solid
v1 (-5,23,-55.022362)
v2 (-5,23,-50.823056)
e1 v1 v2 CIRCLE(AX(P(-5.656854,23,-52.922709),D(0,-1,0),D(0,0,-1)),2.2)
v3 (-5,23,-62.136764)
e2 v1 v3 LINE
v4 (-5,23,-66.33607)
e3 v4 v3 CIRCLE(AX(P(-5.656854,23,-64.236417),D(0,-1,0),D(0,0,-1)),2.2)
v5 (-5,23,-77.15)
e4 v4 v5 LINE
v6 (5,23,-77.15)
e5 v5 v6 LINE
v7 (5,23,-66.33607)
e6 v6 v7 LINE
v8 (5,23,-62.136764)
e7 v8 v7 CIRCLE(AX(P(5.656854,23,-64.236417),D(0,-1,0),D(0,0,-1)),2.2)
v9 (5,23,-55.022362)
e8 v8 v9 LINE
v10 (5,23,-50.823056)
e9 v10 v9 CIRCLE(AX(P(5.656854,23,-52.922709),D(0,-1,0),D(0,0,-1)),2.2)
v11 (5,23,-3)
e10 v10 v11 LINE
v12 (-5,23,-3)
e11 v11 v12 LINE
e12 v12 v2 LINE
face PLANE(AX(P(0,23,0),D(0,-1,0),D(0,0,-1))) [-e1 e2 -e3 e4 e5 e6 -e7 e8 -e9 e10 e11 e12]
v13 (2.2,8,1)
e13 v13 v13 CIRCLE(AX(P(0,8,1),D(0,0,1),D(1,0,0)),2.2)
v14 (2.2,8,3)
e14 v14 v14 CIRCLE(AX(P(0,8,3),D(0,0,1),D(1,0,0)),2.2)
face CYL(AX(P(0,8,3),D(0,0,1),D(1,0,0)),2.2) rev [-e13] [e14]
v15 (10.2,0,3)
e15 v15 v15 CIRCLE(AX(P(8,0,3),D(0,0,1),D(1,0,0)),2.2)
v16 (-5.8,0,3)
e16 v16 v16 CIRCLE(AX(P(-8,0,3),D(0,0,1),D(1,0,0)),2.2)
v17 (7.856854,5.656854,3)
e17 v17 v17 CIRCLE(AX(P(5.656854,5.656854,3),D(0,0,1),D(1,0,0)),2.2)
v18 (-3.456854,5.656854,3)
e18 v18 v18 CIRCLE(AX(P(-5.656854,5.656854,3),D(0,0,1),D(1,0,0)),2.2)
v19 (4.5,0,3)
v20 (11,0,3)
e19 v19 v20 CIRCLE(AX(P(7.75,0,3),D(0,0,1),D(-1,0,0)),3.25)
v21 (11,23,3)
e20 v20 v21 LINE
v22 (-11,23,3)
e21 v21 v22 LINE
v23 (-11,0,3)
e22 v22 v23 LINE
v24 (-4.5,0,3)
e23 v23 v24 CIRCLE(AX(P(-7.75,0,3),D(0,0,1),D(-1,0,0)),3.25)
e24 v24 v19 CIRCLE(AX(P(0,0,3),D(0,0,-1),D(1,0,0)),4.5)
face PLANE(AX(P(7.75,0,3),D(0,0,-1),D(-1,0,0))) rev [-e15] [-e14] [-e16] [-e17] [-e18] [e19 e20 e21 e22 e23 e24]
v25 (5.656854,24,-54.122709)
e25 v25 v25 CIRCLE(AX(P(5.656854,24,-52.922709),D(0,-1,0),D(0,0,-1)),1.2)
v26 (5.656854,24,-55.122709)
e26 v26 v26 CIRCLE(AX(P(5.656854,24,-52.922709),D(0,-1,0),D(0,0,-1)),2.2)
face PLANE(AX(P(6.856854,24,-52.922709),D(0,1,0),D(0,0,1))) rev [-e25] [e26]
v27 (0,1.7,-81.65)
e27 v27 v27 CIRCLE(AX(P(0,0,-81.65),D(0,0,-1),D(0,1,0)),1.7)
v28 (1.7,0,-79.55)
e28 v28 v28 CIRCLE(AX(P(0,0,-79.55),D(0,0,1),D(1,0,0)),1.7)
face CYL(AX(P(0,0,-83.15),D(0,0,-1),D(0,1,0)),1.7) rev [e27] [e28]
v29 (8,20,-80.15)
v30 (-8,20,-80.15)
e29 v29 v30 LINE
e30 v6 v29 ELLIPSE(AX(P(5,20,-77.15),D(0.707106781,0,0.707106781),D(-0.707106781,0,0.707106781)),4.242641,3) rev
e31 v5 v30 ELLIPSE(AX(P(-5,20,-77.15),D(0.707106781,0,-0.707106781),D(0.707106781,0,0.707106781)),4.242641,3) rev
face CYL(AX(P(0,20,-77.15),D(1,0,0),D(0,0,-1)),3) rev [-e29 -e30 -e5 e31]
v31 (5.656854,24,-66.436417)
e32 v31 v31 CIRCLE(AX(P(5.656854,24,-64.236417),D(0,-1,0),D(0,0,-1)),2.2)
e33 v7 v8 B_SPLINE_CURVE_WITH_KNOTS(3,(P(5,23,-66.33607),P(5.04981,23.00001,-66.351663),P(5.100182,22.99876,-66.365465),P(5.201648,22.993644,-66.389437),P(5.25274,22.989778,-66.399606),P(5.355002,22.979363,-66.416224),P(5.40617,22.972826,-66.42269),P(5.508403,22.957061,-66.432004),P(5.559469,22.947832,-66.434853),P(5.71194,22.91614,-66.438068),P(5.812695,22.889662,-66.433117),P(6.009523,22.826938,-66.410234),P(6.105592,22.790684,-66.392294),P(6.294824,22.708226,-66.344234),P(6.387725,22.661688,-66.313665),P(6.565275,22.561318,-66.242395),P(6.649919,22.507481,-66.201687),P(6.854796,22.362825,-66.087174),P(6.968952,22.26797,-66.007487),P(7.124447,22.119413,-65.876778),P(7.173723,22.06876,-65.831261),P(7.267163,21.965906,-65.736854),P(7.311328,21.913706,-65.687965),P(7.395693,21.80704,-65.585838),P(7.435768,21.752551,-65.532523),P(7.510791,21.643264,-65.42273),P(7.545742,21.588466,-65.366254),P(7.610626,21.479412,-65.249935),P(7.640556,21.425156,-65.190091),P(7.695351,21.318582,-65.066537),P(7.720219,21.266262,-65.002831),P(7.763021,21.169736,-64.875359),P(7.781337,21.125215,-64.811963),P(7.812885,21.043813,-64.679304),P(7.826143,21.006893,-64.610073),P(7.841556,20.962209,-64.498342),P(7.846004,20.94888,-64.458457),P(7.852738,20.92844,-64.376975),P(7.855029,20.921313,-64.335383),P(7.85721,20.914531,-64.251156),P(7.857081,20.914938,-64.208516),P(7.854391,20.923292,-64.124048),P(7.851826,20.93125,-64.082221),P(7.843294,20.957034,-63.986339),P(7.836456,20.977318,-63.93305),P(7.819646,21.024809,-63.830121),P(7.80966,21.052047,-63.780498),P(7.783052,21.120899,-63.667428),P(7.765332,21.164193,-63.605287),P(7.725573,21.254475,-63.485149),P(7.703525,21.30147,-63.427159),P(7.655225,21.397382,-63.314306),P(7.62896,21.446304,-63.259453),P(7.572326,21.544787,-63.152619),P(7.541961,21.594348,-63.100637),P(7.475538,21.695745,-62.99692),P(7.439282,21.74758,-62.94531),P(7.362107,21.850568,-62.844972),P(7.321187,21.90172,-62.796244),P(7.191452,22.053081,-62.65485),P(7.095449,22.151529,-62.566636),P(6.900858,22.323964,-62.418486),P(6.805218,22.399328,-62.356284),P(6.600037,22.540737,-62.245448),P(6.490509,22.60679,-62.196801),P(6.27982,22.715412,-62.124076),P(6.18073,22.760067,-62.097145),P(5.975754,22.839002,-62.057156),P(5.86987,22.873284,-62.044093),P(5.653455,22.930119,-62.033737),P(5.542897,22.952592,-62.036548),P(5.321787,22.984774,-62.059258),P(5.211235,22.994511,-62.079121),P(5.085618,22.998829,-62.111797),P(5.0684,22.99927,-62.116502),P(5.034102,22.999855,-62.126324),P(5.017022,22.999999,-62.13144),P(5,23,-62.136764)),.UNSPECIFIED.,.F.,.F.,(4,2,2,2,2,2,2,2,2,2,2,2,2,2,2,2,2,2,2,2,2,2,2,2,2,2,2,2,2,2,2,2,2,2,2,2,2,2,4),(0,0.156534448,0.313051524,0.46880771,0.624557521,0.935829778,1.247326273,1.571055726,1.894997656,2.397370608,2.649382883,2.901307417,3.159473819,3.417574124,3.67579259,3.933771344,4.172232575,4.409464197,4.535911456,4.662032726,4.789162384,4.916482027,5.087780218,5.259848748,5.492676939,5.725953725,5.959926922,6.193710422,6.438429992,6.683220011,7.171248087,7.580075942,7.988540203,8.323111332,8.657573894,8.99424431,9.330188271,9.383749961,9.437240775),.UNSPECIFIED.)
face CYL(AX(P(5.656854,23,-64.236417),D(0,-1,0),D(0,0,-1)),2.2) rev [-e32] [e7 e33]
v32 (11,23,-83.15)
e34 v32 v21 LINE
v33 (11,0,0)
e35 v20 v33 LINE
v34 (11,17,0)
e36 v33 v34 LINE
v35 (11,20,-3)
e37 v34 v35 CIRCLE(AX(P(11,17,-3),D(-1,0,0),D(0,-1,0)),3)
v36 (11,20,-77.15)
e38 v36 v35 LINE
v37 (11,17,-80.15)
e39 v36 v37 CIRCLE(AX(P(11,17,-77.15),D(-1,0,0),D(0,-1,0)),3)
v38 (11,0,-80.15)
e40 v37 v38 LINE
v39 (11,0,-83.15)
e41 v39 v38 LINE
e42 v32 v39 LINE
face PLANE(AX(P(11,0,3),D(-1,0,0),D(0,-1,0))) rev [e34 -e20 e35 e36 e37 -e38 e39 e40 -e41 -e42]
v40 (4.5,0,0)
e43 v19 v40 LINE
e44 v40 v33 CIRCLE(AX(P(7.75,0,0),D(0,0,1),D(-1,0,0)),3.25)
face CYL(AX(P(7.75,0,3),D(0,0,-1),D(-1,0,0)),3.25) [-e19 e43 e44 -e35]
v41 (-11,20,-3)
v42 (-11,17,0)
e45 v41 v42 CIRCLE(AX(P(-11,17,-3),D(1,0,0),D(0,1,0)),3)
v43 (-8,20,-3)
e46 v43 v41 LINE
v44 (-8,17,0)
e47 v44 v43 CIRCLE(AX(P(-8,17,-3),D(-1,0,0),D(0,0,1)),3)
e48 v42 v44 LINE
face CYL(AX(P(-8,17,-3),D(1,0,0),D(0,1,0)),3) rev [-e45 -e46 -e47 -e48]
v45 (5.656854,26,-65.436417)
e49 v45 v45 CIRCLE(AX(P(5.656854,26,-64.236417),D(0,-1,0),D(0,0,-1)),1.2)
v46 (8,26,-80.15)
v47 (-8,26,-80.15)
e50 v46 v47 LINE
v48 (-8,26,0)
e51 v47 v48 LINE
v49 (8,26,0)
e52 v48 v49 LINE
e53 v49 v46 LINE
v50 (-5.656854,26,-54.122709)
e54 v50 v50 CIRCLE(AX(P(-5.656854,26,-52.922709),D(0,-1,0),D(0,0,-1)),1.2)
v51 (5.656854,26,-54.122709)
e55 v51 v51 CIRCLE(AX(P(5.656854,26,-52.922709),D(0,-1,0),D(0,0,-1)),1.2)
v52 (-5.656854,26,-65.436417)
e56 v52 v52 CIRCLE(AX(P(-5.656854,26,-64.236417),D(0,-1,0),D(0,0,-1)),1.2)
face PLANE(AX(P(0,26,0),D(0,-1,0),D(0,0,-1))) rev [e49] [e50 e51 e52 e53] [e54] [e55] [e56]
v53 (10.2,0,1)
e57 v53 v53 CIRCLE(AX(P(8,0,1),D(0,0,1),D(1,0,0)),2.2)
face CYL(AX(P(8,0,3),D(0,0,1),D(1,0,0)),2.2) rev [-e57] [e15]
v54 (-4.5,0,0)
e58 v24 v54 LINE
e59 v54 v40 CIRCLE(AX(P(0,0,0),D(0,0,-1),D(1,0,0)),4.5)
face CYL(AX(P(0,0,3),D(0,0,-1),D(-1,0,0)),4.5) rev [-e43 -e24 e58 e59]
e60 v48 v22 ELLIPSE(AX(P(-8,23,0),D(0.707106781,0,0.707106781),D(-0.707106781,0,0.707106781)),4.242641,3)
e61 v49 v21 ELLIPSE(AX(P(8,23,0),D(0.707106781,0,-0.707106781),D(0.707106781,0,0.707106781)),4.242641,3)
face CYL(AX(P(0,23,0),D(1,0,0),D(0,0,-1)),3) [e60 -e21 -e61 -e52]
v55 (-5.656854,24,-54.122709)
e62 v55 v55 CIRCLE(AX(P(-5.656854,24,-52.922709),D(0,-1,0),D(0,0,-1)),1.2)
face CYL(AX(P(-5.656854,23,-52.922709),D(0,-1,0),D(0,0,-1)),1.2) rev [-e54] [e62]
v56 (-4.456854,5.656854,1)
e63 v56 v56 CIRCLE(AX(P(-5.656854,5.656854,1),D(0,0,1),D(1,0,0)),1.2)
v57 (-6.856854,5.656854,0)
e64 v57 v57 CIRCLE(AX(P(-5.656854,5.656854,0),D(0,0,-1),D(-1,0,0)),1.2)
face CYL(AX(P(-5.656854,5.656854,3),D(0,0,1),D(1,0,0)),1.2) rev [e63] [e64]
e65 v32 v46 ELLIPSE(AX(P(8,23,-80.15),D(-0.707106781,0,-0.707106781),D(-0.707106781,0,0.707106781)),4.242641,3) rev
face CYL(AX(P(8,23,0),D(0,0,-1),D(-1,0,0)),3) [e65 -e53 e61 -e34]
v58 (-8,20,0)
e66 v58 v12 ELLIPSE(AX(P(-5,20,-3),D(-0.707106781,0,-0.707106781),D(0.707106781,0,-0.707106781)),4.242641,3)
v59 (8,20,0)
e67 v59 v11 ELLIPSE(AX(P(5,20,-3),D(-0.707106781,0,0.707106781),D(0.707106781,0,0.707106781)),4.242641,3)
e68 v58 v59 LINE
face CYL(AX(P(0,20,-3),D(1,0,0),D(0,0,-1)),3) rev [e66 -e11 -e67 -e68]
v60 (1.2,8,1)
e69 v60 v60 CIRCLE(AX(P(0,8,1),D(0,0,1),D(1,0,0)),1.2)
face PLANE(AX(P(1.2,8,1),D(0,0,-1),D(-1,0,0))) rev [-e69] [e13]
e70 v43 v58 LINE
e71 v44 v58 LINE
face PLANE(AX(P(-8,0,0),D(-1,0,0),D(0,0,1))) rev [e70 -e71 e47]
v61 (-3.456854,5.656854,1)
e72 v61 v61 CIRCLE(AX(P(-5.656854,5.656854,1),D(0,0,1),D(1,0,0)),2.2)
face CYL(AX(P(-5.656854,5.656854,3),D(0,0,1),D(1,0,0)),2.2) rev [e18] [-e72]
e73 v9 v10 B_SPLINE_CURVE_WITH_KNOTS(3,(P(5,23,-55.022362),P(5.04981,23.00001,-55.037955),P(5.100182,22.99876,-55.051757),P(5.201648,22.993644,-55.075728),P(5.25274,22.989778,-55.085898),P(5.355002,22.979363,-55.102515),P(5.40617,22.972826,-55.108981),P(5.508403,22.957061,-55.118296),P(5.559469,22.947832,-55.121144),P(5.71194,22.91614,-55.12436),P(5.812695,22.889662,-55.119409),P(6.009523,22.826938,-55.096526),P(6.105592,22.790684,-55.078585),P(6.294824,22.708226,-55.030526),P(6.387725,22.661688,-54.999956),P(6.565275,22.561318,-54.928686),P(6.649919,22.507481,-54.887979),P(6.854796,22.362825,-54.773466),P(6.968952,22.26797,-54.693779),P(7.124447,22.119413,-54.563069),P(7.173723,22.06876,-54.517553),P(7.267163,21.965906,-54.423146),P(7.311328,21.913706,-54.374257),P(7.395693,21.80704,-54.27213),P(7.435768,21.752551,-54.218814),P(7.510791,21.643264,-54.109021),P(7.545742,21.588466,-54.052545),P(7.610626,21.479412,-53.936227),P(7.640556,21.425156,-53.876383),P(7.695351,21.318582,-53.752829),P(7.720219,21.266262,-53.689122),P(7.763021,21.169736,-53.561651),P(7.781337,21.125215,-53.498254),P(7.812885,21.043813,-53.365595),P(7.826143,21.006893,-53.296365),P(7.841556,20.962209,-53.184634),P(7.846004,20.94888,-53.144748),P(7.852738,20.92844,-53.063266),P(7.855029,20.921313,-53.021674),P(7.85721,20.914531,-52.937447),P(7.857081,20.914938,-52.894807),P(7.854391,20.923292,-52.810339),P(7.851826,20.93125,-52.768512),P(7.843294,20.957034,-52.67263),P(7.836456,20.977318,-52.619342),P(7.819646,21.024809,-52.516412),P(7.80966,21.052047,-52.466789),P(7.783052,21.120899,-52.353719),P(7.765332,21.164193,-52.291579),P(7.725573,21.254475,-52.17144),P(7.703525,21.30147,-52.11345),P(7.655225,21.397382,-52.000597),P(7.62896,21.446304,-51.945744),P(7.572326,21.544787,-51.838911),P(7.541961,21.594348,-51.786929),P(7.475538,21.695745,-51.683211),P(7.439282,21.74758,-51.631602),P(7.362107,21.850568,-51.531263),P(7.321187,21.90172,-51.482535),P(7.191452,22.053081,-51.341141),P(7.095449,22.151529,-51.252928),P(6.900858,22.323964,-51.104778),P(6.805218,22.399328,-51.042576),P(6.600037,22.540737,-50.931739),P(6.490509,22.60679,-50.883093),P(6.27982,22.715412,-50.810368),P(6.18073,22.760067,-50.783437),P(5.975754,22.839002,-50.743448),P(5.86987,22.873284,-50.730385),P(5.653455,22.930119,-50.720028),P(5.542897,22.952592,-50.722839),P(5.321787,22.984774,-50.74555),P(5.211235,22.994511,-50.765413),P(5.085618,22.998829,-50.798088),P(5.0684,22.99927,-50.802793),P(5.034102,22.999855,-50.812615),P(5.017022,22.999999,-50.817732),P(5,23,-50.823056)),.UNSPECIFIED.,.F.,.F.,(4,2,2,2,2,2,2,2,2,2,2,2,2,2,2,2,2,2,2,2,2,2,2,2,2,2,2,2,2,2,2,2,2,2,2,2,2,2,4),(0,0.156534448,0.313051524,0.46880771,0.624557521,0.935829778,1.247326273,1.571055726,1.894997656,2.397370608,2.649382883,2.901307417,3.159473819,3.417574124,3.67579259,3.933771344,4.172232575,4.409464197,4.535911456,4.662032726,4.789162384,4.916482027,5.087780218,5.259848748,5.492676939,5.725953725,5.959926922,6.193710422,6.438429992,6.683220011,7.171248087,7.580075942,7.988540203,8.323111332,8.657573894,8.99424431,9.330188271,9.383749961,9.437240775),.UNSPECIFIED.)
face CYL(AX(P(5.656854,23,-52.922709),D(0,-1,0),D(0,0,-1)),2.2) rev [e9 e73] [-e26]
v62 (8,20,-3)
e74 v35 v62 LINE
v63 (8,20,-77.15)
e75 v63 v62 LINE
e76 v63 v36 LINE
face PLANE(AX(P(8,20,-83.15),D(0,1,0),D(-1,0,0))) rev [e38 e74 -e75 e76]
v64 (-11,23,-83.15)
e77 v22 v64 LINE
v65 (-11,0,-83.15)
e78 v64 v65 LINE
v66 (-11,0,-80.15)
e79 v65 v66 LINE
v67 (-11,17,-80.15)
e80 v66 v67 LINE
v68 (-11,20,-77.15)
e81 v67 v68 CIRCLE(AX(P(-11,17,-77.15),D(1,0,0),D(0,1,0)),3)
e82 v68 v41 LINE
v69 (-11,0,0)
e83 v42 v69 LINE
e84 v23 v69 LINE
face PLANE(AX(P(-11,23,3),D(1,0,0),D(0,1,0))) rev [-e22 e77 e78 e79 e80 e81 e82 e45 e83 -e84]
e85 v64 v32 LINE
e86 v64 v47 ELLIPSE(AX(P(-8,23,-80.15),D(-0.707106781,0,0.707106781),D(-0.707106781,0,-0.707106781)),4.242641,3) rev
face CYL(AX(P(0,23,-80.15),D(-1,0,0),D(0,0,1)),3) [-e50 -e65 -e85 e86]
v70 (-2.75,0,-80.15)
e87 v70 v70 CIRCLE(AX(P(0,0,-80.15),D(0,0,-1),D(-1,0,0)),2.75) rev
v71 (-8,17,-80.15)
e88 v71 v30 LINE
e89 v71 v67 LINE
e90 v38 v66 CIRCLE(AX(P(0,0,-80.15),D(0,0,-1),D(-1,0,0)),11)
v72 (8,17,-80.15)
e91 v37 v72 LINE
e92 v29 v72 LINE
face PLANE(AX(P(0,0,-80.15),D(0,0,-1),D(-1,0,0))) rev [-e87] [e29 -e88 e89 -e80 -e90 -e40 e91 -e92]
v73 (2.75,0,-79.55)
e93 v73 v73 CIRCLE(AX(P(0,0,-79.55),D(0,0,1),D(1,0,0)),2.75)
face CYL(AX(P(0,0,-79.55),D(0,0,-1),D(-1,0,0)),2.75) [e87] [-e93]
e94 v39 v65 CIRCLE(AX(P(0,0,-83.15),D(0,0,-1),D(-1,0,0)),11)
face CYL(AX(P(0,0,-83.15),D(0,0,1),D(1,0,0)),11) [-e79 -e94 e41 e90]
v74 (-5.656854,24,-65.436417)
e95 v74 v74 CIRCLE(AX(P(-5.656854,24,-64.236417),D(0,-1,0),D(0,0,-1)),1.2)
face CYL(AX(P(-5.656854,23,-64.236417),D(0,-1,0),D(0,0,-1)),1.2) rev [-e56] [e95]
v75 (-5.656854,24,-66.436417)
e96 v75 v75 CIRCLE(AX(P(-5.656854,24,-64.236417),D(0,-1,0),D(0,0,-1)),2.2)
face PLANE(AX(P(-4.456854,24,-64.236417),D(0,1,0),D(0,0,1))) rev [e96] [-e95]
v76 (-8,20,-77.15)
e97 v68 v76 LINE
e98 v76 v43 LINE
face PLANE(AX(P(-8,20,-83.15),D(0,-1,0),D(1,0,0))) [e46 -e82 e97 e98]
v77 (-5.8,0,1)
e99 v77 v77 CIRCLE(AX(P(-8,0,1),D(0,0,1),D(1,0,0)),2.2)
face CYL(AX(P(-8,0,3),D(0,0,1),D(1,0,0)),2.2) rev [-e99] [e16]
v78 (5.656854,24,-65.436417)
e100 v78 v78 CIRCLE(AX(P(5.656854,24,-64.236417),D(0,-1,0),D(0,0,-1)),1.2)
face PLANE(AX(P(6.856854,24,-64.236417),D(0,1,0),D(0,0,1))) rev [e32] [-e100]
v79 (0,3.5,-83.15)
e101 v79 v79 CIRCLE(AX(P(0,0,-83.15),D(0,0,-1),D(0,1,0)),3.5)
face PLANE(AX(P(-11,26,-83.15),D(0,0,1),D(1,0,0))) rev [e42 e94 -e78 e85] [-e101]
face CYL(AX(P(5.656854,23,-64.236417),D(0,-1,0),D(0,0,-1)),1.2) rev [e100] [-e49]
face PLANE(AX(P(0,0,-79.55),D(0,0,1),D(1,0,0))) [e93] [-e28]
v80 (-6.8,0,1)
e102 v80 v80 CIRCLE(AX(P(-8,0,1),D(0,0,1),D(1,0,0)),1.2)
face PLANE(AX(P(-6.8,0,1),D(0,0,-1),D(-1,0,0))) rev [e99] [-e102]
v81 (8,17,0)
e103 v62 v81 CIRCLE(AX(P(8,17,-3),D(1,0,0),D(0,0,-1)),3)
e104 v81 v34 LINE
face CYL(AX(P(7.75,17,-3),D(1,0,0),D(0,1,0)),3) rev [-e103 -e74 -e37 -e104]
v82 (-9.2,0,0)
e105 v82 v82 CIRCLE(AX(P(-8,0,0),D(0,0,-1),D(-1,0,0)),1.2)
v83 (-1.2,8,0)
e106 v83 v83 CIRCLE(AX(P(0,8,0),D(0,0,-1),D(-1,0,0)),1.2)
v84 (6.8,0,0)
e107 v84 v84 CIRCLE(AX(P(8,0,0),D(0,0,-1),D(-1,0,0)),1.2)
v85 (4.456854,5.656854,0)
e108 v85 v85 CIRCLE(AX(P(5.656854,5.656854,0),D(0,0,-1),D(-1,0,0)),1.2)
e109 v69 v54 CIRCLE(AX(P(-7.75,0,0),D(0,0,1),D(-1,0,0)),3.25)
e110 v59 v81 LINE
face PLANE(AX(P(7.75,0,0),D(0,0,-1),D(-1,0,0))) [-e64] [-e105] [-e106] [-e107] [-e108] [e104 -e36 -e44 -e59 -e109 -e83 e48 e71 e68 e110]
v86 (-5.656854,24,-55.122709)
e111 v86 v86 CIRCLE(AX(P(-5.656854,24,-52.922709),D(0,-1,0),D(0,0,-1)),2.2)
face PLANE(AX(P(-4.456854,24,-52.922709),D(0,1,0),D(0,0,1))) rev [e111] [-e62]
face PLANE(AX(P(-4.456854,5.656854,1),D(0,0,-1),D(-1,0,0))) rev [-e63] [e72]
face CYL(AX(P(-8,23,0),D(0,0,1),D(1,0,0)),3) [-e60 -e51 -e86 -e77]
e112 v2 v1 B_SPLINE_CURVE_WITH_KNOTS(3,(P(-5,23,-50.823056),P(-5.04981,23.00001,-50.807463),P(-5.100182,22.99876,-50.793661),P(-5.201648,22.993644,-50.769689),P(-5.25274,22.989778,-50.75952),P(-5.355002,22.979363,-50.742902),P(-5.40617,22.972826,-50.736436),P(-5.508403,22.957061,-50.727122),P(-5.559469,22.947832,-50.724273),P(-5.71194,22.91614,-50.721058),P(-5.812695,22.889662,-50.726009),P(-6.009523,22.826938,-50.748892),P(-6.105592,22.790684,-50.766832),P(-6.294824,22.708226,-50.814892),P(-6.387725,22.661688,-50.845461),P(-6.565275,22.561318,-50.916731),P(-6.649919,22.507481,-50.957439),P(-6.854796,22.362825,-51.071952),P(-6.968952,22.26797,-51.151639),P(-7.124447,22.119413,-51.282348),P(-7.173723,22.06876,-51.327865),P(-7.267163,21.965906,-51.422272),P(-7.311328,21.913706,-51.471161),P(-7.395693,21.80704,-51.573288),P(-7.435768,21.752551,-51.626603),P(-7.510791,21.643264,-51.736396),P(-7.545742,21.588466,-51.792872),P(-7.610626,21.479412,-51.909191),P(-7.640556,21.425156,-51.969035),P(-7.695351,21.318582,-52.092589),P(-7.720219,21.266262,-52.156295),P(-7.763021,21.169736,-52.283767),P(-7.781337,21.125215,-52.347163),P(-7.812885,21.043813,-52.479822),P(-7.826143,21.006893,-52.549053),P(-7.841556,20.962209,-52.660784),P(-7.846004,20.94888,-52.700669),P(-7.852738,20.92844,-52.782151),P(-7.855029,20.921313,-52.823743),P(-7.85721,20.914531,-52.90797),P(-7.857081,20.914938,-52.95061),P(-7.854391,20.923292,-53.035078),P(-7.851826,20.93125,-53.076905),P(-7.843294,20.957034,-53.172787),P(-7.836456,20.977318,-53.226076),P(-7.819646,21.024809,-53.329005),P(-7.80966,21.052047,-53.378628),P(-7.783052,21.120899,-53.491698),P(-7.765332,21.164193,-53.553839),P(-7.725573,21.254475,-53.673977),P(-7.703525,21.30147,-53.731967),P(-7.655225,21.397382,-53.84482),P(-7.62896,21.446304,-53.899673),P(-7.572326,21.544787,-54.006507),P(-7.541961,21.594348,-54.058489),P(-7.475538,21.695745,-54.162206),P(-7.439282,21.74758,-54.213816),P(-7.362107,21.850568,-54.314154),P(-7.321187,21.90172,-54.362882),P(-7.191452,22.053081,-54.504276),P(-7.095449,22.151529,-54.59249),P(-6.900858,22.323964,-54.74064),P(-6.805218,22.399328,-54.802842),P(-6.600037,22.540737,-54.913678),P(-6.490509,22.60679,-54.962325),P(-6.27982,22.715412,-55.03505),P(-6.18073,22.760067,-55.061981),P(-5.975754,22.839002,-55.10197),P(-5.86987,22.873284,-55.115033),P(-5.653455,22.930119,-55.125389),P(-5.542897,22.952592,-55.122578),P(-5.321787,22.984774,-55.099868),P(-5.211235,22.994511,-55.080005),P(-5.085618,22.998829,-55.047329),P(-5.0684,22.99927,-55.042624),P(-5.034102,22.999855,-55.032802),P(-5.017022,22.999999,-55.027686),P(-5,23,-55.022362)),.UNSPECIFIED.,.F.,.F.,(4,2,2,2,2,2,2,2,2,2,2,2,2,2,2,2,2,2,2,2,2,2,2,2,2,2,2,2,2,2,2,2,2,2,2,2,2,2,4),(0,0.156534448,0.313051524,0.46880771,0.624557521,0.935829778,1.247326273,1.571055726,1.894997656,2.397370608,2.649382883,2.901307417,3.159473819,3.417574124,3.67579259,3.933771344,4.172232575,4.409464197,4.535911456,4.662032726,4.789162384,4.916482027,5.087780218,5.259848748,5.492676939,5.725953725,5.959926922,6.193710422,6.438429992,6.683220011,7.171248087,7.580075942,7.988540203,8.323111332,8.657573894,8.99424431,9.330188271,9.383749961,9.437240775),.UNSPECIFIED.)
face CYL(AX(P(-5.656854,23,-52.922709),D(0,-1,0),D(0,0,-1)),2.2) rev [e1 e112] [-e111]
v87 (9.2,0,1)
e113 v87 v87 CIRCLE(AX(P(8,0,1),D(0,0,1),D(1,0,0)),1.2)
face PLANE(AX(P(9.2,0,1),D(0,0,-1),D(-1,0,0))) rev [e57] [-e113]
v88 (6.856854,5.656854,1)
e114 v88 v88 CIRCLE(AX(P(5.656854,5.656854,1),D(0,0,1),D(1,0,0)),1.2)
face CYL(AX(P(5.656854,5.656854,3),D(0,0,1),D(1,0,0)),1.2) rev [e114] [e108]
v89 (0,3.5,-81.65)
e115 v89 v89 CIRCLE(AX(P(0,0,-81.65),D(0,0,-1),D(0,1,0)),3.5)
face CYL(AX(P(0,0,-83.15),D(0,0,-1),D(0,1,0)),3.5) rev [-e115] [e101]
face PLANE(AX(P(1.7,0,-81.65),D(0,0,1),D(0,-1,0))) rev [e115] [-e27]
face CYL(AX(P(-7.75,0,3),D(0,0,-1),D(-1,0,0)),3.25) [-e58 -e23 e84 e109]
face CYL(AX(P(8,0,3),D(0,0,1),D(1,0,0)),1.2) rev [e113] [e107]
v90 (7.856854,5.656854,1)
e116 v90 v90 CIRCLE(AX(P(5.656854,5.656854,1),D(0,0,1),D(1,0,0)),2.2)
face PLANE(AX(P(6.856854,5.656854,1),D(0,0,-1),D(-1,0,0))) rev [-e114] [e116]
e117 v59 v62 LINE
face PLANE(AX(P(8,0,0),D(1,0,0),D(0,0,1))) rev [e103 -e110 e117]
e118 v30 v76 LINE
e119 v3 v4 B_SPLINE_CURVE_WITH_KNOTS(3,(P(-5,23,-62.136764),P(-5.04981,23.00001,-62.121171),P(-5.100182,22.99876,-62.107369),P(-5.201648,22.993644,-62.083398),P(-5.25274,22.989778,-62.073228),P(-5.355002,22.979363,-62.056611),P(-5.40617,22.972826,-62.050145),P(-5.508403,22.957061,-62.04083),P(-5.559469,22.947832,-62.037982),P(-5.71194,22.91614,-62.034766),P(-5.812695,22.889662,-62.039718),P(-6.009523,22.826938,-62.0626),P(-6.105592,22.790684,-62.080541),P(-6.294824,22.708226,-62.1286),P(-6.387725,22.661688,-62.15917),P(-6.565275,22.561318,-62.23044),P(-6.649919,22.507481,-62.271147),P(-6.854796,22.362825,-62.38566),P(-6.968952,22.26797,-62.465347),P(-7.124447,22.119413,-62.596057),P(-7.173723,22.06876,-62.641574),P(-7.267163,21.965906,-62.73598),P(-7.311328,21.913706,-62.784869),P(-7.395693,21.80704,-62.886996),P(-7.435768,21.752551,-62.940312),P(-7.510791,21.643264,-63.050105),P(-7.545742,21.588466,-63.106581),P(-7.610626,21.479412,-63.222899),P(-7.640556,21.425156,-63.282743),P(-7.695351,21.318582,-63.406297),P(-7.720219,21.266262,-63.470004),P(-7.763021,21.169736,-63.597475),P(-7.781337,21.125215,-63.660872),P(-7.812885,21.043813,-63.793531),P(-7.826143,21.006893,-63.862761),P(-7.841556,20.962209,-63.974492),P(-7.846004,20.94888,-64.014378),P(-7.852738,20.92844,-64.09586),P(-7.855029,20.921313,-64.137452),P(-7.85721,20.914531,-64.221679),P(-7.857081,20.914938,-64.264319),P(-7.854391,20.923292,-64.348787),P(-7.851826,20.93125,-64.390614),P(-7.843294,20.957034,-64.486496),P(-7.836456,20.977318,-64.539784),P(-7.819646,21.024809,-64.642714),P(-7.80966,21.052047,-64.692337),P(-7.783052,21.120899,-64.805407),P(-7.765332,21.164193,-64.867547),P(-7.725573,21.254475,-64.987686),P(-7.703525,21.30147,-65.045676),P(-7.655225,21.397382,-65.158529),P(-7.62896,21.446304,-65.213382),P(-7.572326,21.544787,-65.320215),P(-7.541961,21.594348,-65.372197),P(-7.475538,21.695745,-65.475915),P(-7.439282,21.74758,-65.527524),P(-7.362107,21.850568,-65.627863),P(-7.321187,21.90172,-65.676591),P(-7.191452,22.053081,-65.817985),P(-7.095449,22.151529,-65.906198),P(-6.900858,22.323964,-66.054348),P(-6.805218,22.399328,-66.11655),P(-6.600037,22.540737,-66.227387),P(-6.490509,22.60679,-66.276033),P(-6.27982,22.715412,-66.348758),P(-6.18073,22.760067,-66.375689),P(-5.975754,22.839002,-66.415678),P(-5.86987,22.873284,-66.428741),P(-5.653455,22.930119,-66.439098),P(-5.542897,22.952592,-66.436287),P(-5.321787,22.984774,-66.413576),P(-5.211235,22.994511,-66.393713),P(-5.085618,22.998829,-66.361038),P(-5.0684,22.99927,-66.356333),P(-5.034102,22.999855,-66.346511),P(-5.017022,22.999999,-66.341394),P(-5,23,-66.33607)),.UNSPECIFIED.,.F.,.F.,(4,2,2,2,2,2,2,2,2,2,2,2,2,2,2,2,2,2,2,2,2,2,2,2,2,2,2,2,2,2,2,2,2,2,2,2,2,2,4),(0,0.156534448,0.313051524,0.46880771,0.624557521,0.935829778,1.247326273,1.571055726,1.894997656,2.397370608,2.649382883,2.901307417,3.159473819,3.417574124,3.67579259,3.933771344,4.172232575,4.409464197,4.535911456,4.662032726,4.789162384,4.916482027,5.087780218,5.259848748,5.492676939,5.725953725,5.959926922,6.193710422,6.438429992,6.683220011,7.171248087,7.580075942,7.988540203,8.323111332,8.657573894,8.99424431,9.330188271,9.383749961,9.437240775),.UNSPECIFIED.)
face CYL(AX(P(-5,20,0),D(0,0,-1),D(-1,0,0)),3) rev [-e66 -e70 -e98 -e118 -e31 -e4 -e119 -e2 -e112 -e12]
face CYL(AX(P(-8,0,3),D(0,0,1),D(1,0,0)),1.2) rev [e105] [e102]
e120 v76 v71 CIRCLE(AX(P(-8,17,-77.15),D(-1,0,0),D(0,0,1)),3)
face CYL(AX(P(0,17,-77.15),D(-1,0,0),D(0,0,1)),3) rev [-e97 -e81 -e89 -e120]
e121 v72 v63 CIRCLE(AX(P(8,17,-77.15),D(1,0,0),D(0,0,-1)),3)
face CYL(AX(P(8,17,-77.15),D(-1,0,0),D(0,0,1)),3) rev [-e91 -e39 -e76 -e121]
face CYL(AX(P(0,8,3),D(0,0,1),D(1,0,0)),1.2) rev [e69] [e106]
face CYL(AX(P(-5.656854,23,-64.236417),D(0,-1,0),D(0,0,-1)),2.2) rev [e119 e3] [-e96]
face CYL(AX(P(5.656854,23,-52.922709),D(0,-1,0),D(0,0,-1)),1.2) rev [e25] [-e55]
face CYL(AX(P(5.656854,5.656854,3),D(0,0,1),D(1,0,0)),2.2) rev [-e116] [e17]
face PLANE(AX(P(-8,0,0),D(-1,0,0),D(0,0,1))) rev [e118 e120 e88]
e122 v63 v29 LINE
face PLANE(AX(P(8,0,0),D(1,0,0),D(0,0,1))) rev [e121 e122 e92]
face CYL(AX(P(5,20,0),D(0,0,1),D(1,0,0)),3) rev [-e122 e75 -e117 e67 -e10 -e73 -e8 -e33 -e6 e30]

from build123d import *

# Parameters (mm, degrees)
RESSALTO_EXTRUS_O1_DEPTH                             = 3
ESBO_O2_W                                            = 22
ESBO_O2_H                                            = 86.15
RESSALTO_EXTRUS_O2_DEPTH                             = 3
RESSALTO_EXTRUS_O3_DEPTH                             = 3
REBAIXO_PARA_SHCS_M21_D                              = 2.4
REBAIXO_PARA_SHCS_M21_DEPTH                          = 3
REBAIXO_PARA_SHCS_M21_CBORE_D                        = 4.4
REBAIXO_PARA_SHCS_M21_CBORE_DEPTH                    = 2
PADR_OCIRCULAR1_COUNT                                = 5
PADR_OCIRCULAR1_ANGLE                                = 180
ESBO_O10_R                                           = 2.75
RESSALTO_EXTRUS_O4_DEPTH                             = 0.6
REBAIXO_PARA_PARAFUSO_COM_CABE_A_PANELA_D            = 3.4
REBAIXO_PARA_PARAFUSO_COM_CABE_A_PANELA_CBORE_D      = 7
REBAIXO_PARA_PARAFUSO_COM_CABE_A_PANELA_CBORE_DEPTH  = 1.5
ESBO_O14_W                                           = 86.15
ESBO_O14_H                                           = 6
RESSALTO_EXTRUS_O5_DEPTH                             = 3
REBAIXO_PARA_PARAFUSO_COM_CABE_A_REDONDA_D           = 2.4
REBAIXO_PARA_PARAFUSO_COM_CABE_A_REDONDA_CBORE_D     = 4.4
REBAIXO_PARA_PARAFUSO_COM_CABE_A_REDONDA_CBORE_DEPTH = 1
FILETE2_R                                            = 3
FILETE1_R                                            = 3


with BuildPart() as part:
    # Esboço1 → Ressalto-extrusão1 (new body)
    with BuildSketch(Plane.XY):
        with BuildLine():
            Line((11, 0), (11, 23))
            Line((11, 23), (-11, 23))
            Line((-11, 23), (-11, 0))
            ThreePointArc((-11, 0), (-7.75, -3.25), (-4.5, 0))
            ThreePointArc((-4.5, 0), (0, 4.5), (4.5, 0))
            ThreePointArc((4.5, 0), (7.75, -3.25), (11, 0))
        make_face()
    extrude(amount=RESSALTO_EXTRUS_O1_DEPTH)

    # Esboço2 → Ressalto-extrusão2 (add)
    with BuildSketch(Plane(origin=(0, 23, 0), x_dir=(1, 0, 0), z_dir=(0, 1, 0))):
        with Locations((0, 40.075)):
            Rectangle(ESBO_O2_W, ESBO_O2_H)
    extrude(amount=RESSALTO_EXTRUS_O2_DEPTH)

    # Esboço3 → Ressalto-extrusão3 (add)
    with BuildSketch(Plane(origin=(0, 0, -80.15), x_dir=(-1, 0, 0), z_dir=(0, 0, -1))):
        with BuildLine():
            Line((-11, 0), (-11, 23))
            Line((-11, 23), (11, 23))
            Line((11, 23), (11, 0))
            ThreePointArc((11, 0), (0, -11), (-11, 0))
        make_face()
    extrude(amount=RESSALTO_EXTRUS_O3_DEPTH)

    # Rebaixo para SHCS M21
    with Locations(Plane.XY.offset(3)):
        with Locations((8, 0)):
            rebaixo_para_shcs_m21 = CounterBoreHole(REBAIXO_PARA_SHCS_M21_D / 2, REBAIXO_PARA_SHCS_M21_CBORE_D / 2, REBAIXO_PARA_SHCS_M21_CBORE_DEPTH, depth=REBAIXO_PARA_SHCS_M21_DEPTH)

    # PadrãoCircular1: Rebaixo para SHCS M21 ×5 about axis
    padr_ocircular1_axis = Axis((0, 0, 0), (0, 0, 1))
    for i in range(1, PADR_OCIRCULAR1_COUNT):
        add(rebaixo_para_shcs_m21.rotate(padr_ocircular1_axis, i * PADR_OCIRCULAR1_ANGLE / (PADR_OCIRCULAR1_COUNT - 1)), mode=Mode.SUBTRACT)

    # Esboço10 → Ressalto-extrusão4 (add)
    with BuildSketch(Plane.XY.offset(-80.15)):
        with Locations(Location((0, 0, 0), (0, 0, 180))):
            Circle(ESBO_O10_R)
    extrude(amount=RESSALTO_EXTRUS_O4_DEPTH)

    # Rebaixo para parafuso com cabeça panela de M31 (through all)
    with Locations(Plane(origin=(0, 0, -83.15), x_dir=(-1, 0, 0), z_dir=(0, 0, -1))):
        with Locations((0, 0)):
            CounterBoreHole(REBAIXO_PARA_PARAFUSO_COM_CABE_A_PANELA_D / 2, REBAIXO_PARA_PARAFUSO_COM_CABE_A_PANELA_CBORE_D / 2, REBAIXO_PARA_PARAFUSO_COM_CABE_A_PANELA_CBORE_DEPTH)

    # Esboço14 → Ressalto-extrusão5 (add)
    with BuildSketch(Plane.ZY.offset(11)):
        with Locations((-40.075, 23)):
            Rectangle(ESBO_O14_W, ESBO_O14_H)
    ressalto_extrus_o5 = extrude(amount=-RESSALTO_EXTRUS_O5_DEPTH)

    # Espelhar2: Ressalto-extrusão5 across plane
    add(ressalto_extrus_o5.mirror(Plane(origin=(0, 0, 0), x_dir=(0, 0, 1), z_dir=(1, 0, 0))))

    # Rebaixo para parafuso com cabeça redonda de M21 (through all)
    with Locations(Plane(origin=(0, 23, 0), x_dir=(-1, 0, 0), z_dir=(0, -1, 0))):
        with Locations((5.656854249, 64.236417264), (5.656854249, 52.922708765), (-5.656854249, 52.922708765), (-5.656854249, 64.236417264)):
            CounterBoreHole(REBAIXO_PARA_PARAFUSO_COM_CABE_A_REDONDA_D / 2, REBAIXO_PARA_PARAFUSO_COM_CABE_A_REDONDA_CBORE_D / 2, REBAIXO_PARA_PARAFUSO_COM_CABE_A_REDONDA_CBORE_DEPTH)

    # Filete2
    filete2_edges = [part.edges().sort_by_distance(p)[0] for p in [
        (-9.5, 20, -80.15),
        (-9.5, 20, 0),
        (9.5, 20, -80.15),
        (9.5, 20, 0),
    ]]
    fillet(filete2_edges, radius=FILETE2_R)

    # Filete1
    # the kernel refuses this fillet: 3 mm, written as the material it adds along each edge
    with BuildSketch(Plane(origin=(8, 23, -80.15), x_dir=(0, 0, 1), z_dir=(-1, 0, 0))) as filete1_piece_1:
        with BuildLine():
            CenterArc((FILETE1_R, -FILETE1_R), FILETE1_R, 90, 90)
            Line((0, -FILETE1_R), (0, 0))
            Line((0, 0), (FILETE1_R, 0))
        make_face()
    extrude(amount=16)
    with BuildSketch(Plane(origin=(-8, 23, 0), x_dir=(0, -1, 0), z_dir=(0, 0, -1))) as filete1_piece_2_section:
        with BuildLine():
            CenterArc((FILETE1_R, -FILETE1_R), FILETE1_R, 90, 90)
            Line((0, -FILETE1_R), (0, 0))
            Line((0, 0), (FILETE1_R, 0))
        make_face()
    filete1_piece_2 = extrude(amount=80.15, mode=Mode.PRIVATE)
    filete1_piece_2 = filete1_piece_2 - Plane(origin=(-5.656854249, 22.304141759, -52.922708765), x_dir=(-1, 0, 0), z_dir=(0, -1, 0)) * Cylinder(2.2, 173, mode=Mode.PRIVATE)
    filete1_piece_2 = filete1_piece_2 - Plane(origin=(-5.656854249, 22.304141759, -64.236417264), x_dir=(-1, 0, 0), z_dir=(0, -1, 0)) * Cylinder(2.2, 173, mode=Mode.PRIVATE)
    add(filete1_piece_2)
    with BuildSketch(Plane(origin=(8, 23, 0), x_dir=(0, 0, -1), z_dir=(-1, 0, 0))) as filete1_piece_3:
        with BuildLine():
            CenterArc((FILETE1_R, FILETE1_R), FILETE1_R, 180, 90)
            Line((0, FILETE1_R), (0, 0))
            Line((0, 0), (FILETE1_R, 0))
        make_face()
    extrude(amount=16)
    with BuildSketch(Plane(origin=(8, 23, 0), x_dir=(-1, 0, 0), z_dir=(0, 0, -1))) as filete1_piece_4_section:
        with BuildLine():
            CenterArc((FILETE1_R, -FILETE1_R), FILETE1_R, 90, 90)
            Line((0, -FILETE1_R), (0, 0))
            Line((0, 0), (FILETE1_R, 0))
        make_face()
    filete1_piece_4 = extrude(amount=80.15, mode=Mode.PRIVATE)
    filete1_piece_4 = filete1_piece_4 - Plane(origin=(5.656854249, 22.30418368, -52.922708765), x_dir=(-1, 0, 0), z_dir=(0, -1, 0)) * Cylinder(2.2, 173, mode=Mode.PRIVATE)
    filete1_piece_4 = filete1_piece_4 - Plane(origin=(5.656854249, 22.30418368, -64.236417264), x_dir=(-1, 0, 0), z_dir=(0, -1, 0)) * Cylinder(2.2, 173, mode=Mode.PRIVATE)
    add(filete1_piece_4)
    # the kernel refuses this fillet: 3 mm, written as the material it takes off along each edge
    with BuildSketch(Plane(origin=(-11, 26, -90.65), x_dir=(0, -1, 0), z_dir=(0, 0, 1)), Plane(origin=(11, 26, 10.5), x_dir=(0, -1, 0), z_dir=(0, 0, -1))) as filete1_2_piece_1:
        with BuildLine():
            CenterArc((FILETE1_R, FILETE1_R), FILETE1_R, 180, 90)
            Line((0, FILETE1_R), (0, 0))
            Line((0, 0), (FILETE1_R, 0))
        make_face()
    extrude(amount=101.15, mode=Mode.SUBTRACT)
    with BuildSketch(Plane(origin=(18.5, 26, 3), x_dir=(0, 0, -1), z_dir=(-1, 0, 0)), Plane(origin=(18.5, 26, -83.15), x_dir=(0, -1, 0), z_dir=(-1, 0, 0))) as filete1_2_piece_2:
        with BuildLine():
            CenterArc((FILETE1_R, FILETE1_R), FILETE1_R, 180, 90)
            Line((0, FILETE1_R), (0, 0))
            Line((0, 0), (FILETE1_R, 0))
        make_face()
    extrude(amount=37, mode=Mode.SUBTRACT)


solid = part.part
